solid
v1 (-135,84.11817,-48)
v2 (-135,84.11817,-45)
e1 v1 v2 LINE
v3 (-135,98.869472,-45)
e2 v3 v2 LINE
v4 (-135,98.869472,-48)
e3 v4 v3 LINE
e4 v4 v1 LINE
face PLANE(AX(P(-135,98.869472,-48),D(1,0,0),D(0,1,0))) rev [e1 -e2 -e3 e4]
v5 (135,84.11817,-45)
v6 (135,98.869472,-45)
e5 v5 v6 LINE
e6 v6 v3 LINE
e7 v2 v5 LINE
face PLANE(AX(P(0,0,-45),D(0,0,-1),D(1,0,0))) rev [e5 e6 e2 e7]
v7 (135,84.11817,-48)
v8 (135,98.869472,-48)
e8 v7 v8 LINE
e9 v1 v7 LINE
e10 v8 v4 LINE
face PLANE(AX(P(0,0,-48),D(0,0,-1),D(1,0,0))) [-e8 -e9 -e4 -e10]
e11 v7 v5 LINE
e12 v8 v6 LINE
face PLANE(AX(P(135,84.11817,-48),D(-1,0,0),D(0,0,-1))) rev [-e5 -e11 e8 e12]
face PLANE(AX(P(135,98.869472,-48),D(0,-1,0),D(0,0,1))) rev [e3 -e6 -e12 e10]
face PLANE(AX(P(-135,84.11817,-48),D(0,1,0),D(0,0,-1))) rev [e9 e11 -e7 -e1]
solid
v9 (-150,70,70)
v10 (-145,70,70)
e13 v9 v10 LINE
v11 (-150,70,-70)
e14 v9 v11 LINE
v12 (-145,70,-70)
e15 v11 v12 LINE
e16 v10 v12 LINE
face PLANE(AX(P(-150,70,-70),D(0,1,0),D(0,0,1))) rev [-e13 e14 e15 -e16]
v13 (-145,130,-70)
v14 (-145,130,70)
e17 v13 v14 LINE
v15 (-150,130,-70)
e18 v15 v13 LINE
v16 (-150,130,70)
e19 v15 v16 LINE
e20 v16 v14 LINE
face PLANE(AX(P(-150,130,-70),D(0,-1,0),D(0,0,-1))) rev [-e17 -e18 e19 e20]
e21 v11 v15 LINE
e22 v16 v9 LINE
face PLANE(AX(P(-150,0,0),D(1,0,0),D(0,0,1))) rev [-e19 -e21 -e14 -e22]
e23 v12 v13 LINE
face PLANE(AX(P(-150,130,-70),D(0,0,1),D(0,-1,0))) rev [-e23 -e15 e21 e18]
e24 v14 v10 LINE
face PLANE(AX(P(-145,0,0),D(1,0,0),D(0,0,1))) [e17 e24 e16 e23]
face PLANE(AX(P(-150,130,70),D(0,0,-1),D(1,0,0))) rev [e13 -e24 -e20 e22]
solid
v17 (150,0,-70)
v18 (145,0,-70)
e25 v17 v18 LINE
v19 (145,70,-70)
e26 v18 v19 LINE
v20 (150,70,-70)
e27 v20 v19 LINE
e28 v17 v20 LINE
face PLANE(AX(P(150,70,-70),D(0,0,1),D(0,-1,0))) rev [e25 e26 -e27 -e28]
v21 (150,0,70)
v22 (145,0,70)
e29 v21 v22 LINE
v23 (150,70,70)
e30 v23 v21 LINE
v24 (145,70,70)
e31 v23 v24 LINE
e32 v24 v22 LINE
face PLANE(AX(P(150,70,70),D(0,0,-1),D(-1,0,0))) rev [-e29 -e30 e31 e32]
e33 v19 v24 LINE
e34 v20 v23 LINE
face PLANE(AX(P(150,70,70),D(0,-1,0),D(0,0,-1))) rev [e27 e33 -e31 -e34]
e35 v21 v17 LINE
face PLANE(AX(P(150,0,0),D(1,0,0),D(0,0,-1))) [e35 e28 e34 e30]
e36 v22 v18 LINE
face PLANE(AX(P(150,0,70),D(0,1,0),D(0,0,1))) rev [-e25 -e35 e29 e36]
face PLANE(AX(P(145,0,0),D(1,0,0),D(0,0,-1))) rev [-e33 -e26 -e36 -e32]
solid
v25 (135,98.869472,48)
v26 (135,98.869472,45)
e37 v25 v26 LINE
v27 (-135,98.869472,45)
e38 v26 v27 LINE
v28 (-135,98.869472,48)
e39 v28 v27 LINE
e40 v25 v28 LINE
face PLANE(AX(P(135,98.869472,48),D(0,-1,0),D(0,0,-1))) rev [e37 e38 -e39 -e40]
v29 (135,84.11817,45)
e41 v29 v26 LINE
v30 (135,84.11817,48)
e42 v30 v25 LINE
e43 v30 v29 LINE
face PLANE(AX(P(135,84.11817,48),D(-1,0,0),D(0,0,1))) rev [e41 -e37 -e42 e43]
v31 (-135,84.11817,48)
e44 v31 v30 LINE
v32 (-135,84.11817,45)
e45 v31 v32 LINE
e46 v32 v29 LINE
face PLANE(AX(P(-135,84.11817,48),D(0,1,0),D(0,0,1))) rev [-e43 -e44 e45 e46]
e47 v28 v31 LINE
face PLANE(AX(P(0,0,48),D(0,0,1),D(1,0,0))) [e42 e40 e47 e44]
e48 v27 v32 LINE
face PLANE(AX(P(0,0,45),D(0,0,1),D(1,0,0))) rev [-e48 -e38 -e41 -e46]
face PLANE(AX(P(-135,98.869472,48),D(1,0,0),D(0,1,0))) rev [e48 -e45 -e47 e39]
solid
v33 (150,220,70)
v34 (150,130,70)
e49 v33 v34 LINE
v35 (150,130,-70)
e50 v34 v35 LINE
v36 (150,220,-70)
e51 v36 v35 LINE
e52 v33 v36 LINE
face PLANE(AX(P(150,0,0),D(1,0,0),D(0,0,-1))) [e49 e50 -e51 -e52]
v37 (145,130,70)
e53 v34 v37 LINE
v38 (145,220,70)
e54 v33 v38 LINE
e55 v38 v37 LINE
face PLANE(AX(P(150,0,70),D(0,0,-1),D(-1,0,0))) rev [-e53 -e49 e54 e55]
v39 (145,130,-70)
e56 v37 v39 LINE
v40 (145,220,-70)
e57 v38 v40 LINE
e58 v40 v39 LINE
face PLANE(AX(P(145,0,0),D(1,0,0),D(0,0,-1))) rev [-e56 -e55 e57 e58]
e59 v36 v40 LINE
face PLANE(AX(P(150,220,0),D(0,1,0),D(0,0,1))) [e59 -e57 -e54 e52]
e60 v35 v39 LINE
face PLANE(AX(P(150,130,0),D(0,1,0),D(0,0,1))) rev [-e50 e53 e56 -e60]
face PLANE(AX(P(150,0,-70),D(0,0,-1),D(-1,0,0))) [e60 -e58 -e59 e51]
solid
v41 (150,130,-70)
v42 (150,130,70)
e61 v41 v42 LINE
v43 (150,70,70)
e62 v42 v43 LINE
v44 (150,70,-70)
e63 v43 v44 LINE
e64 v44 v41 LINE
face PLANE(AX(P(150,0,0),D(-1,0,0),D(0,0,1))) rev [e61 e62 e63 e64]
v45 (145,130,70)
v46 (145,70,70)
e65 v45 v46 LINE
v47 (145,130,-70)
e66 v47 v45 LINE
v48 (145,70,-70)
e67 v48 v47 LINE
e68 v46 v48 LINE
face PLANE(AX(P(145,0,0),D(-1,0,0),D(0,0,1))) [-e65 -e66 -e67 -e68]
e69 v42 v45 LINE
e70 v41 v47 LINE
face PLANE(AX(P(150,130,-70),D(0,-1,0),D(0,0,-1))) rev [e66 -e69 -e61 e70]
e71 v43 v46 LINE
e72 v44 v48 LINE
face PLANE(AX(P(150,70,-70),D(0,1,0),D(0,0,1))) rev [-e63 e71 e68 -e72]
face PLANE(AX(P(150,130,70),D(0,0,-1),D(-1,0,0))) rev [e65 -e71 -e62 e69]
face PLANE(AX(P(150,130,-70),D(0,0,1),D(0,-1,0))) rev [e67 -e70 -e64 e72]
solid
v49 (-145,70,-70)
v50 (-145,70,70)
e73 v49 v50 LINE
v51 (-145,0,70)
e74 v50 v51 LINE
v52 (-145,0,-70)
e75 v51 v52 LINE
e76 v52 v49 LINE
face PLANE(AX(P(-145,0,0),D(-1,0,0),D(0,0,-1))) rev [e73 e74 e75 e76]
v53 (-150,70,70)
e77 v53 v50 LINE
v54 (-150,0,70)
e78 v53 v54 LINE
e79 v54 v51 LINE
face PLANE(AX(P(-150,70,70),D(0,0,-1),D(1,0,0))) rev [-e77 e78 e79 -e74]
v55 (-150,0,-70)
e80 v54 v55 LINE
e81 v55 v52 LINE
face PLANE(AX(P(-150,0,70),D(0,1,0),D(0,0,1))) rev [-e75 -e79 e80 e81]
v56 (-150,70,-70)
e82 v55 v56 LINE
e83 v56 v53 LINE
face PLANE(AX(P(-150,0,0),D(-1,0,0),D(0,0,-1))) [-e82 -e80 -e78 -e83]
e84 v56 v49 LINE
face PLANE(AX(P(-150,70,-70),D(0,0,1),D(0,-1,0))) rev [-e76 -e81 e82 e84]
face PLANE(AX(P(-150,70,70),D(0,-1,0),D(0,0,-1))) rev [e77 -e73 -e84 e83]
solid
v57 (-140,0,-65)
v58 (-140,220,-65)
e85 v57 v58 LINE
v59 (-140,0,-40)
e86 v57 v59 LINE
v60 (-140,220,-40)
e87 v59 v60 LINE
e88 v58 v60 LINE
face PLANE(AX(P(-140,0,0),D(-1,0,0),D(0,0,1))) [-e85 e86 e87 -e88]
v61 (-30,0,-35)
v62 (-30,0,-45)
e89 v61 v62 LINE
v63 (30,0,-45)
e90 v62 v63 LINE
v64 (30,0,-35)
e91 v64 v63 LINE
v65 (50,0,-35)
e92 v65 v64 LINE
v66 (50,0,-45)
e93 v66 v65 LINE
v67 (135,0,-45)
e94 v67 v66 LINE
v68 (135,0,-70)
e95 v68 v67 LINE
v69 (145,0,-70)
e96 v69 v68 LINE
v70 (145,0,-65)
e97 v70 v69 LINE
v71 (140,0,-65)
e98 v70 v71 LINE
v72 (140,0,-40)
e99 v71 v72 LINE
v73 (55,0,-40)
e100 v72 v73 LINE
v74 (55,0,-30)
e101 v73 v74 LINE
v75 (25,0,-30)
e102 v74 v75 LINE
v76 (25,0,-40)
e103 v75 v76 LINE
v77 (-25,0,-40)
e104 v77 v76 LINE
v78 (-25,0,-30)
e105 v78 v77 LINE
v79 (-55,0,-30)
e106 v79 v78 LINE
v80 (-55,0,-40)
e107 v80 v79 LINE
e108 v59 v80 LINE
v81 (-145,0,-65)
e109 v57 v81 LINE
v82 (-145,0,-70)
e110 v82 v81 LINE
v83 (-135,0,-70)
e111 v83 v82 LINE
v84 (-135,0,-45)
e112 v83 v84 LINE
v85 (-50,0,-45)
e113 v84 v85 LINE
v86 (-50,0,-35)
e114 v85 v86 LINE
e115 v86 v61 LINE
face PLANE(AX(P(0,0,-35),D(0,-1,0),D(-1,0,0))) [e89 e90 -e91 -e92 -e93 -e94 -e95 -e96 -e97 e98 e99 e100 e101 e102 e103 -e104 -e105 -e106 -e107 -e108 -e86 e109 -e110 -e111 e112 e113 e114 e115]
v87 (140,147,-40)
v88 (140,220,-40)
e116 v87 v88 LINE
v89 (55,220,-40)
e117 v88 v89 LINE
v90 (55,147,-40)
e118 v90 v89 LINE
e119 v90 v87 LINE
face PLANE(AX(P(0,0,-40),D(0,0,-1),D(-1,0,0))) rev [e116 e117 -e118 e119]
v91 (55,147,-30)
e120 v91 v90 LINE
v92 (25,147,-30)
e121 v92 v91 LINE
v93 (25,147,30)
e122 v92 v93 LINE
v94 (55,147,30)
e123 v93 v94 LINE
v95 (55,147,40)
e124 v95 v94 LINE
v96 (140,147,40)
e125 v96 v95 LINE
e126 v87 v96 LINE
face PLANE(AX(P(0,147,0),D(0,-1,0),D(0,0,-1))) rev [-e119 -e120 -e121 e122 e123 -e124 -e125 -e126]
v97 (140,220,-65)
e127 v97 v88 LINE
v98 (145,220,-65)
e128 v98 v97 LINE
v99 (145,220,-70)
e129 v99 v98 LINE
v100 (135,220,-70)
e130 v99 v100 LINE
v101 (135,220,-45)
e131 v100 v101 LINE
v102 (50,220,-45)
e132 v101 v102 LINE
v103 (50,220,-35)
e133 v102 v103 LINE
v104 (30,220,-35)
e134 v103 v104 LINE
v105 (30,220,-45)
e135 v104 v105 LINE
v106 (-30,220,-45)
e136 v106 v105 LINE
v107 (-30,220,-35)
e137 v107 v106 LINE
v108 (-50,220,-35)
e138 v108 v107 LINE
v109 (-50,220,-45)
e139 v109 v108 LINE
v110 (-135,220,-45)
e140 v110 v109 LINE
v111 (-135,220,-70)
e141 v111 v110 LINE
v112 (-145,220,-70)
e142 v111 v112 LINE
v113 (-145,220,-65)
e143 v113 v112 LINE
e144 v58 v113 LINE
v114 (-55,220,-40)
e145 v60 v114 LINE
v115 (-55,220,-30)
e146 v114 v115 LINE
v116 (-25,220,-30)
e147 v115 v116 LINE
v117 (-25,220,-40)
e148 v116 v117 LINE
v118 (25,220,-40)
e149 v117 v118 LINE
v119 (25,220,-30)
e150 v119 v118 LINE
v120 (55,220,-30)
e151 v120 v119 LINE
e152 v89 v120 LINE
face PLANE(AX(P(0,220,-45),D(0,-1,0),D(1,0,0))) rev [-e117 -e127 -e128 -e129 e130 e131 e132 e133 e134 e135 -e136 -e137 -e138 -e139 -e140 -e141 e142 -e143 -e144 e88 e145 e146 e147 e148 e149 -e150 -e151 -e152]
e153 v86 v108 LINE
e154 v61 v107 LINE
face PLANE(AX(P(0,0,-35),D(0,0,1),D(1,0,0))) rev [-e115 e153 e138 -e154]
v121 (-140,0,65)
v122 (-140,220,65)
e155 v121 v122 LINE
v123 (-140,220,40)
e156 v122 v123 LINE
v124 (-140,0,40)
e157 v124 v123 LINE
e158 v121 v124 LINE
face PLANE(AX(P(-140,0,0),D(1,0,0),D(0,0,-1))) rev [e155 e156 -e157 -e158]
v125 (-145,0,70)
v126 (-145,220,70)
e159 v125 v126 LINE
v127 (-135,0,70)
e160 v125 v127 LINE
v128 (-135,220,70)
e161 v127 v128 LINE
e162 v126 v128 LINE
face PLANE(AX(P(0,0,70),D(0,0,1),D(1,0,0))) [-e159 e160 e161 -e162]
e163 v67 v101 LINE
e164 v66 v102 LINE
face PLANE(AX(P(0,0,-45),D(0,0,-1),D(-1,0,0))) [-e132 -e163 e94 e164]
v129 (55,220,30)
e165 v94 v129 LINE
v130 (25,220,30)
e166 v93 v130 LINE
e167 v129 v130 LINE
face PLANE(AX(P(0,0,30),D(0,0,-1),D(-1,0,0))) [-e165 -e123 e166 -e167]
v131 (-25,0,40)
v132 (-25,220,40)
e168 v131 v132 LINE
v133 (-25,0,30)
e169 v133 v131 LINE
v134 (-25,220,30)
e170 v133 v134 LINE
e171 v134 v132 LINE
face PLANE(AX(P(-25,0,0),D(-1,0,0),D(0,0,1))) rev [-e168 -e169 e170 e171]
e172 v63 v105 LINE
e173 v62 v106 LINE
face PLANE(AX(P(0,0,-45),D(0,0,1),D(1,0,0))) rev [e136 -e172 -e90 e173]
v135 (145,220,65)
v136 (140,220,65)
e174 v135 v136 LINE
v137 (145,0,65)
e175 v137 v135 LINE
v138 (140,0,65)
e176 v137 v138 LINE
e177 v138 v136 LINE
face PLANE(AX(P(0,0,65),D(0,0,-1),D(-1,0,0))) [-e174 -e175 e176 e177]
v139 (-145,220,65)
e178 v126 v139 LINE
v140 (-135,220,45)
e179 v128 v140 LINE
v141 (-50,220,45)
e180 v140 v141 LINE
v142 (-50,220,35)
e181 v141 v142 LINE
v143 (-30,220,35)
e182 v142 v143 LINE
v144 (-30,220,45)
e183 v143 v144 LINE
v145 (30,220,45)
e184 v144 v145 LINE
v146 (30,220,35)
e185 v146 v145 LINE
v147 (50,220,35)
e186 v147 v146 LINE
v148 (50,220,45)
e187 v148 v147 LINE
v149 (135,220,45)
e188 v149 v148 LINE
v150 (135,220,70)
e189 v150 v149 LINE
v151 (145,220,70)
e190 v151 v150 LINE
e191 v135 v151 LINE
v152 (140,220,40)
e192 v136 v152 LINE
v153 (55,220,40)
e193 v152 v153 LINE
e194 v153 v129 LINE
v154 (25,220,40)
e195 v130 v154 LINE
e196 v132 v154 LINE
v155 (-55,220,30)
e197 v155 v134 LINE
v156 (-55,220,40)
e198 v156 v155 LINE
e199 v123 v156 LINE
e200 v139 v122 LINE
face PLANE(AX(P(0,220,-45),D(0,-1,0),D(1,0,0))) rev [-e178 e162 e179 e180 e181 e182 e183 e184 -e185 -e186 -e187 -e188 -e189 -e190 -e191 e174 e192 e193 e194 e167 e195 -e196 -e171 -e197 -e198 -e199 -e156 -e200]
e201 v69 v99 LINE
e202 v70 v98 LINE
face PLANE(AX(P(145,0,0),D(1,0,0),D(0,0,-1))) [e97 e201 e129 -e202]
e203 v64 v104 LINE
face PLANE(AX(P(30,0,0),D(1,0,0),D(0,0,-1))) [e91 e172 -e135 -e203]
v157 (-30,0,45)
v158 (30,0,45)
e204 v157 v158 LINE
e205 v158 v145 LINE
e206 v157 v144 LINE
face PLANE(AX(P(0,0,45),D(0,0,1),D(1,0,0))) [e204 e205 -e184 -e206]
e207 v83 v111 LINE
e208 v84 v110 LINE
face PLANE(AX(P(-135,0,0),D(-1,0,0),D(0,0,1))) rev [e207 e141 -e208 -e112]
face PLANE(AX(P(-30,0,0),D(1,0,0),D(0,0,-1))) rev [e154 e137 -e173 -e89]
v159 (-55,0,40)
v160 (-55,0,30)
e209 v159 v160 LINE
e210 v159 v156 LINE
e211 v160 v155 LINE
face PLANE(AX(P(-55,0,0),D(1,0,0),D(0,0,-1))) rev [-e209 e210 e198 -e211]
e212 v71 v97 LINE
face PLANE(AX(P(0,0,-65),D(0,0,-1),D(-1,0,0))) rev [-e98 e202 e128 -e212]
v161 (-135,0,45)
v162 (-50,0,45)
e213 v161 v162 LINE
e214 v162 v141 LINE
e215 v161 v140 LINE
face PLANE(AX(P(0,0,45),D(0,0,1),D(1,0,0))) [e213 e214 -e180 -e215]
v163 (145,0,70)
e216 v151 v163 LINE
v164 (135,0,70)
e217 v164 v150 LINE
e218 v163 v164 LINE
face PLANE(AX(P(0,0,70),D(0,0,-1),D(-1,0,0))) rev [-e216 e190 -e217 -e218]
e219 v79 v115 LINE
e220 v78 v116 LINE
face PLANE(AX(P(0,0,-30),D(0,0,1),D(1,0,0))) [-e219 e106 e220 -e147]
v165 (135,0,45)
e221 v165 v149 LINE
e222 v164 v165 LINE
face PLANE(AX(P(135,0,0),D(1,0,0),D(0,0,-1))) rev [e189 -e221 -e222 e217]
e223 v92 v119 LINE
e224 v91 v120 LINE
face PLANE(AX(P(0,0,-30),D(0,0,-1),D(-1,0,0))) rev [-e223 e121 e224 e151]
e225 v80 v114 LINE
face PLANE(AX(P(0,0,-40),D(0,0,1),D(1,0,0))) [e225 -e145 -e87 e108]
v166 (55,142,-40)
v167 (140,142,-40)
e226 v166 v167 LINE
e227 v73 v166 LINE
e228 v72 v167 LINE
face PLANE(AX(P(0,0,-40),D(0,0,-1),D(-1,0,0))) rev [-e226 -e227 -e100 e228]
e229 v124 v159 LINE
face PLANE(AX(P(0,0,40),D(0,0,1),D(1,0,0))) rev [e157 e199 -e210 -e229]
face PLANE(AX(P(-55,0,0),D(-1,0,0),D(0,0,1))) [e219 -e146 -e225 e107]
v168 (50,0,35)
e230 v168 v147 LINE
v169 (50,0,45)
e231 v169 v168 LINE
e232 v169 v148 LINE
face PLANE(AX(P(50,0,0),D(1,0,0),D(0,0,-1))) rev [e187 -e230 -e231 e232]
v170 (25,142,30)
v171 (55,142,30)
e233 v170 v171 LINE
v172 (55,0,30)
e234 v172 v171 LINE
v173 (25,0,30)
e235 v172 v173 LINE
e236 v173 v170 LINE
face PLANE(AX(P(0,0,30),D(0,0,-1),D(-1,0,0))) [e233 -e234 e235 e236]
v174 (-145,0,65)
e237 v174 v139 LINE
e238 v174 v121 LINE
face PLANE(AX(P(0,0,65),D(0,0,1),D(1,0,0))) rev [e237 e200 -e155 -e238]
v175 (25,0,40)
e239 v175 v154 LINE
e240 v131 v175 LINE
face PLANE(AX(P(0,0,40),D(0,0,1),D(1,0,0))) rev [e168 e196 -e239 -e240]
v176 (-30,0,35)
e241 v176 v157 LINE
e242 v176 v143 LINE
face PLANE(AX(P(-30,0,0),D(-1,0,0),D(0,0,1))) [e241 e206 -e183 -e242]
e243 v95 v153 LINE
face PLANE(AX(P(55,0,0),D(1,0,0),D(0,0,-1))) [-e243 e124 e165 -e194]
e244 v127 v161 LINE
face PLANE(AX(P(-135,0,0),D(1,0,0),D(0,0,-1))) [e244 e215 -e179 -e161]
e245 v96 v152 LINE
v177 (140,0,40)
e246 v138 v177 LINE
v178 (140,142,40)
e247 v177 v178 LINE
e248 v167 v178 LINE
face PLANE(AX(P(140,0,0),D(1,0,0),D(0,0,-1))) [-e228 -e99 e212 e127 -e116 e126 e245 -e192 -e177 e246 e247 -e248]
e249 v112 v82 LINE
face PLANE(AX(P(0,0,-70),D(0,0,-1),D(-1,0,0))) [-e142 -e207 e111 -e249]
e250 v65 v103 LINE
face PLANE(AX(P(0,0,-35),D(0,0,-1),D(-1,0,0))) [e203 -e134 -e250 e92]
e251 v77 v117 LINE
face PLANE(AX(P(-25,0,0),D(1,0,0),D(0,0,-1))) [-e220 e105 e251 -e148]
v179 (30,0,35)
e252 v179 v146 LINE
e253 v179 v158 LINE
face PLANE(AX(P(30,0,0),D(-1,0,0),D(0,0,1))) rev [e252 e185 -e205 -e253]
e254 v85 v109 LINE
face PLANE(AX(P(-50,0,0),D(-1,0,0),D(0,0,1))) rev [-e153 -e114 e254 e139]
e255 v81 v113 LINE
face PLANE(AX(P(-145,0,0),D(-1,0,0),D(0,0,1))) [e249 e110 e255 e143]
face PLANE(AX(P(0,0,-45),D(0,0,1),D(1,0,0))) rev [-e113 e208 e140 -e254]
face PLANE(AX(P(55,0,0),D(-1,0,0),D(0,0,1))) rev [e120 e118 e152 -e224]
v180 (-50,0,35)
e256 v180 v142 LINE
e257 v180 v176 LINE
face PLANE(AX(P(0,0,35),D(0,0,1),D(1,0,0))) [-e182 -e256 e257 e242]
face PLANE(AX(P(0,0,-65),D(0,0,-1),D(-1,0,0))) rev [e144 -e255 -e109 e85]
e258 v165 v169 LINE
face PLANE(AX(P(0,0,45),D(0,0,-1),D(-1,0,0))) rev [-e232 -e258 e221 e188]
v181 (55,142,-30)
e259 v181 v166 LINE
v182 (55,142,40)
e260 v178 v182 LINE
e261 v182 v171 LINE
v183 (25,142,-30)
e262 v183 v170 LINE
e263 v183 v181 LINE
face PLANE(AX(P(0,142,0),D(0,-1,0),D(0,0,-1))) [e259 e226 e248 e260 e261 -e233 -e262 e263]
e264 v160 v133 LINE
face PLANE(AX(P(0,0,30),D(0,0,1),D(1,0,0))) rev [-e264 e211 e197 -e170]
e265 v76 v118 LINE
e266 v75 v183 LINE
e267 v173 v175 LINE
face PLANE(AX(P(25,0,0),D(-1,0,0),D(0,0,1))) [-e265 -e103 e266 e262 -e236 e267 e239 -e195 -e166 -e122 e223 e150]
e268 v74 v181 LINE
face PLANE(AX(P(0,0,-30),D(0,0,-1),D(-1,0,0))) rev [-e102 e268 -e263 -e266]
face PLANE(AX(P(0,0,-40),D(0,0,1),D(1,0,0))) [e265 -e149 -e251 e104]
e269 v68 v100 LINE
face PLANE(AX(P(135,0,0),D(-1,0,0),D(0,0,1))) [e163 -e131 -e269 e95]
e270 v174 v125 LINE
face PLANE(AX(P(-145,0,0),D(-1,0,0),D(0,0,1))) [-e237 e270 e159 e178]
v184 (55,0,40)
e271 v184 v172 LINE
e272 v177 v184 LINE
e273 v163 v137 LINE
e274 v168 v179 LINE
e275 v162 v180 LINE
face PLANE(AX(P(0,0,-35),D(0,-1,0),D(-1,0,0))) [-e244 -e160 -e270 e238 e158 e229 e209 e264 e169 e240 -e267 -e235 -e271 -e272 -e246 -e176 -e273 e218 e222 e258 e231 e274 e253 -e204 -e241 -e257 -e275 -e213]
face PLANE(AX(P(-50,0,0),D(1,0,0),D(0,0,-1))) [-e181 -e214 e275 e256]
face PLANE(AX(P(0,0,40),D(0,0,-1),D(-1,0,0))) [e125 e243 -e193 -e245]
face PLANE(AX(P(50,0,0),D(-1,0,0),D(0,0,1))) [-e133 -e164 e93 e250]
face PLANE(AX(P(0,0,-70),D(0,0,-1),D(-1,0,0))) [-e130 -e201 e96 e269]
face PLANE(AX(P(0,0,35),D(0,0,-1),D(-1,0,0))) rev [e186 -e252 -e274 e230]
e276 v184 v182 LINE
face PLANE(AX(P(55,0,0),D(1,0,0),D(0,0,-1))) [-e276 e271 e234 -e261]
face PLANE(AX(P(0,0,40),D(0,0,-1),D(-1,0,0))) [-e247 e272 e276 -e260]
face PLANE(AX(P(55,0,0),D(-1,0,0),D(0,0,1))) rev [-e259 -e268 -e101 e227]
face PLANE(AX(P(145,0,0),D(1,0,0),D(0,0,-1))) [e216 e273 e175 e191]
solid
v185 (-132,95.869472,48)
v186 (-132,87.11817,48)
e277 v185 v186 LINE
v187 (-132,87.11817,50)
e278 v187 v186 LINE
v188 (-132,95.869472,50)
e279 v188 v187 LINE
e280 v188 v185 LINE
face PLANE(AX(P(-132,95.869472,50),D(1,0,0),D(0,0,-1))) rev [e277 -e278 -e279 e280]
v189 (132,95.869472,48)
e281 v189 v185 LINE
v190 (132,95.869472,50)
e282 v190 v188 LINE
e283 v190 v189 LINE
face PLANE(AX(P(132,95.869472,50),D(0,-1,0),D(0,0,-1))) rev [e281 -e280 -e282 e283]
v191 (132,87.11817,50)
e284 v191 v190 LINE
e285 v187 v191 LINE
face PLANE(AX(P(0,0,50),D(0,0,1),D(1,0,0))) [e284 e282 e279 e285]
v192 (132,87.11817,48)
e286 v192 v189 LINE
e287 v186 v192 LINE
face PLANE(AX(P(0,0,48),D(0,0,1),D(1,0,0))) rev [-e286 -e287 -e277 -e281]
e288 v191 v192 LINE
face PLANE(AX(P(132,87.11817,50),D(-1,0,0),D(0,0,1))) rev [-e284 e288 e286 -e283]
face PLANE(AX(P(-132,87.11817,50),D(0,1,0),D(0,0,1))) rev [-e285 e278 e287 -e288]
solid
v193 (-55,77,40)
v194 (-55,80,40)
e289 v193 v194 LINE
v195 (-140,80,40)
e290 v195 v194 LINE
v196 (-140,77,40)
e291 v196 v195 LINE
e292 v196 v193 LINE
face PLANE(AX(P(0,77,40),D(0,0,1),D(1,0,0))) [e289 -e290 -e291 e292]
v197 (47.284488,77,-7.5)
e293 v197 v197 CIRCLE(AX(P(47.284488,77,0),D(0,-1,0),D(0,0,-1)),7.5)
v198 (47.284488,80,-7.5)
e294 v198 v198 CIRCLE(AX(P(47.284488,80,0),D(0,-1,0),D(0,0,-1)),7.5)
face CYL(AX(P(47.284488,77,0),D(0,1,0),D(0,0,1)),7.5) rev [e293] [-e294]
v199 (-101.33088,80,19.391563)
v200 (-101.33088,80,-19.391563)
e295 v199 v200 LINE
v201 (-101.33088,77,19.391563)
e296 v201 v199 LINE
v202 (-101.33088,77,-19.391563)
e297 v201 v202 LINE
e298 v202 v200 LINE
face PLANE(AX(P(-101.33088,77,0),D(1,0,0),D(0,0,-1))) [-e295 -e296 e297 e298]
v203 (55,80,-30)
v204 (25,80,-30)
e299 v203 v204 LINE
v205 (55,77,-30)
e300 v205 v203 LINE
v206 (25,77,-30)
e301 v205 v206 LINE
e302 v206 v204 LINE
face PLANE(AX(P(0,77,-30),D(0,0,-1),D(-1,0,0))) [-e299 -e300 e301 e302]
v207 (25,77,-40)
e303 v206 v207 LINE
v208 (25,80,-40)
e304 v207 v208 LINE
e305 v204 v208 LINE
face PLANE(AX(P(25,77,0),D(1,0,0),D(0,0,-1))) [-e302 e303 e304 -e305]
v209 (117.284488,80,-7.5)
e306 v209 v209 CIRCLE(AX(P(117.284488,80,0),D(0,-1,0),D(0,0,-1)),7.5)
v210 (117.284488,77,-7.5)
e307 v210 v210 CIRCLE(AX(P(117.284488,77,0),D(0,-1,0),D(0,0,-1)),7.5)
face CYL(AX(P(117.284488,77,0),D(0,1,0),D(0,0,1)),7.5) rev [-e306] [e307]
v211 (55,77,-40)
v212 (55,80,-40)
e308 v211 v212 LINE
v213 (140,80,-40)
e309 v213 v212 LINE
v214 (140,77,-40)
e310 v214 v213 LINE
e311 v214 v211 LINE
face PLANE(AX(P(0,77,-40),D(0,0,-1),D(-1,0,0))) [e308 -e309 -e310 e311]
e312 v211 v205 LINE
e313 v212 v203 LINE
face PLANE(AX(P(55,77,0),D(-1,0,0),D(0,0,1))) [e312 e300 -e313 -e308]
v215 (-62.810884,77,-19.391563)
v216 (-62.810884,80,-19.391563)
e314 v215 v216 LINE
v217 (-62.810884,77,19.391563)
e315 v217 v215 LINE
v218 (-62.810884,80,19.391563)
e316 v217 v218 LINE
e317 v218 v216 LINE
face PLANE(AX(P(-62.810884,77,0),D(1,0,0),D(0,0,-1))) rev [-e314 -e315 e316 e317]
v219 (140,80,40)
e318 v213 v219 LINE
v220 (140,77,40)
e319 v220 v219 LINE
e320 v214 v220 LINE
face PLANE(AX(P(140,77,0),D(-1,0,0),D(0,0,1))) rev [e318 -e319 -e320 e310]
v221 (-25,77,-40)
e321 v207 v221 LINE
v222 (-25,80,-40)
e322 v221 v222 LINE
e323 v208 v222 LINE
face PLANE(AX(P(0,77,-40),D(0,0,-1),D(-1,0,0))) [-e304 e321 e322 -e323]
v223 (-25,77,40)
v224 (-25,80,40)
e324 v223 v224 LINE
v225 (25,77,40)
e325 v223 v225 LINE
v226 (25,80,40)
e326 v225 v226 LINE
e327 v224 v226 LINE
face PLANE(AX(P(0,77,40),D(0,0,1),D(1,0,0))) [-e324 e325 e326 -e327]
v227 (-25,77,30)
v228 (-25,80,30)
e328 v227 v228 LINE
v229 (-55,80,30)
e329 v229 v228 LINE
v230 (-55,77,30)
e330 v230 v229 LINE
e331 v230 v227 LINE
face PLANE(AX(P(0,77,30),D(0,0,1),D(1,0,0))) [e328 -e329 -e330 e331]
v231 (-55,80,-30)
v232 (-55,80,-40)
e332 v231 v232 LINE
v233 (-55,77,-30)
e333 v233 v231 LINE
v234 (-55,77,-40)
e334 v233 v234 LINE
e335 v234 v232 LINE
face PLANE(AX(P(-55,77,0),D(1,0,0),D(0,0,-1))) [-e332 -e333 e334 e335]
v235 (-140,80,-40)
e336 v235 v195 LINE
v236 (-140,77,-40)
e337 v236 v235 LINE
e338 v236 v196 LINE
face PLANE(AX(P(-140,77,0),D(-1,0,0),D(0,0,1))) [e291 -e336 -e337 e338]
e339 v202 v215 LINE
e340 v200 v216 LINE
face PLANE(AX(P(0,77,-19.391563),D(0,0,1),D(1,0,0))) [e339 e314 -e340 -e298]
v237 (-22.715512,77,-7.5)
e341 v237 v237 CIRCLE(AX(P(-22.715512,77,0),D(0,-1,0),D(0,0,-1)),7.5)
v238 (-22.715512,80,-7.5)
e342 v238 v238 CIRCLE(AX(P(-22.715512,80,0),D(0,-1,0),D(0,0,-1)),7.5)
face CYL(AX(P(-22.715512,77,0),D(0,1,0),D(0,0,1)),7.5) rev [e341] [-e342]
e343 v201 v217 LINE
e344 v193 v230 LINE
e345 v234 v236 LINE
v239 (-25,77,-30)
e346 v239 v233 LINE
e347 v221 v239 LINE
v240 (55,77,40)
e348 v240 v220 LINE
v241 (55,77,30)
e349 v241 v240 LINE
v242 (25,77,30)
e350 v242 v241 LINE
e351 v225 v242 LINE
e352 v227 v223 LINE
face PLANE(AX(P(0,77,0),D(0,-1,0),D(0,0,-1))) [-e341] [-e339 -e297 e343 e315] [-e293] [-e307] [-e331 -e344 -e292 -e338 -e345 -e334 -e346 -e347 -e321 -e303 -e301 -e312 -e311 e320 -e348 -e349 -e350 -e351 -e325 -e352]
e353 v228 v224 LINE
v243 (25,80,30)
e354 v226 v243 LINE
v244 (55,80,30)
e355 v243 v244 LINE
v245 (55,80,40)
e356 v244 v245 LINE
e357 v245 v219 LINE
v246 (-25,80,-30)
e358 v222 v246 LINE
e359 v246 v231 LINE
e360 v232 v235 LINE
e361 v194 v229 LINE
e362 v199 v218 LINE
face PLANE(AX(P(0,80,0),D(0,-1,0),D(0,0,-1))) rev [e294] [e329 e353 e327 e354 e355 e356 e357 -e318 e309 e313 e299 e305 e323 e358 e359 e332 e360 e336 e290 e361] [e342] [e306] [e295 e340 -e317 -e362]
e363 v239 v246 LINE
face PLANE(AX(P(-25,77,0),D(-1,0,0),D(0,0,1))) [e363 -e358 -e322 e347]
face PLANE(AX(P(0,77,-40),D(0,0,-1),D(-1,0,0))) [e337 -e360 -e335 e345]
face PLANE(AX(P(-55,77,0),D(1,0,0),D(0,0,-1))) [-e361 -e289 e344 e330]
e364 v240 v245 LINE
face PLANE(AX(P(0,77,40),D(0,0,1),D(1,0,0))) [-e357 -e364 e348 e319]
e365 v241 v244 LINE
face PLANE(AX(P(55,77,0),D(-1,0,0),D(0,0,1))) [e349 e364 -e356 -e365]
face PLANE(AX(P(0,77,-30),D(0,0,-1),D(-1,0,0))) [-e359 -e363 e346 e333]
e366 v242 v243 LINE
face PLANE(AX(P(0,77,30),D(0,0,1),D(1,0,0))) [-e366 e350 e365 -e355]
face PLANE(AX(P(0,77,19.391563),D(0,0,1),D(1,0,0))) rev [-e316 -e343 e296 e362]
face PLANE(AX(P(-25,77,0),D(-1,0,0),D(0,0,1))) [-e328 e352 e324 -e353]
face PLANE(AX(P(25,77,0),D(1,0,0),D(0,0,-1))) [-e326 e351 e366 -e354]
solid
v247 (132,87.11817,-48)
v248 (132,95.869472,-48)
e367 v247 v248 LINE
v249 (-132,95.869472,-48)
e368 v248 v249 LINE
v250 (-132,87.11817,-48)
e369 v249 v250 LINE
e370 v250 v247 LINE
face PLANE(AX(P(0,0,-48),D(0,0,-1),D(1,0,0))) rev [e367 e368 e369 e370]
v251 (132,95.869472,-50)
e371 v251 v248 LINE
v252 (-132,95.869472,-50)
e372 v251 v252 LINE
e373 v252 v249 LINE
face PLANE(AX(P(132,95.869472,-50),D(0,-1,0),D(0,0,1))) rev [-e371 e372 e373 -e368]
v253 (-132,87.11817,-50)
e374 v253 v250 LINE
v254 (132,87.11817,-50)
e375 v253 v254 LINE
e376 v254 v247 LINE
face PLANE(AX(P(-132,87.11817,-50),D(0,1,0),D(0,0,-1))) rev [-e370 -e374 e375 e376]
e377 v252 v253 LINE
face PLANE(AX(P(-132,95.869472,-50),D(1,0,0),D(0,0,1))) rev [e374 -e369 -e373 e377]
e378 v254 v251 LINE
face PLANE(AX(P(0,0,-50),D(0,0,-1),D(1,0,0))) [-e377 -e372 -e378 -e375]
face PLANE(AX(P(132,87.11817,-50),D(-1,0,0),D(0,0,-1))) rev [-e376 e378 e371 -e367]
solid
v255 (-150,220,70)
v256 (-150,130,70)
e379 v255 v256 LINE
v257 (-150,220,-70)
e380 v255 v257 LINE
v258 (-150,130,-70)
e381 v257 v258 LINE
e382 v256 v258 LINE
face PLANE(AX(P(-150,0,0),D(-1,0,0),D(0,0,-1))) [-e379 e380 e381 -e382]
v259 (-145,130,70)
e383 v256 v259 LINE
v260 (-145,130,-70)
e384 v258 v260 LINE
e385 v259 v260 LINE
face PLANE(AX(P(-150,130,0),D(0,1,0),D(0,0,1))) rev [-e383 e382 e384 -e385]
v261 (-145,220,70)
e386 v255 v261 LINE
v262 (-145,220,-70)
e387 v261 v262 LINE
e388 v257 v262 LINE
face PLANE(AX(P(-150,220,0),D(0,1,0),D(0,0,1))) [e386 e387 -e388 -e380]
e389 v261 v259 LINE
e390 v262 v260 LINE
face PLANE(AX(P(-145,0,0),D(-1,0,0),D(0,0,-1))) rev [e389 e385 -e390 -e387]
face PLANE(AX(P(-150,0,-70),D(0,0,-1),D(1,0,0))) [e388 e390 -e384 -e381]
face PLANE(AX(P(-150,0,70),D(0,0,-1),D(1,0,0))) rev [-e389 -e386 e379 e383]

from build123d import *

# Parameters (mm, degrees)
EPAISSIR1_DEPTH         = 220
ESQUISSE4_W             = 140
ESQUISSE4_H             = 60
ESQUISSE4_H_2           = 80
ENL_V_MAT_EXTRU_1_DEPTH = 5
ESQUISSE5_W             = 140
ESQUISSE5_H             = 90
BOSS_EXTRU_3_DEPTH      = 5
ESQUISSE7_W             = 140
ESQUISSE7_H             = 60
BOSS_EXTRU_4_DEPTH      = 5
ESQUISSE8_W             = 140
ESQUISSE8_H             = 70
BOSS_EXTRU_5_DEPTH      = 5
ESQUISSE9_R             = 7.5
ESQUISSE9_W             = 38.519996312
ESQUISSE9_H             = 38.783125764
BOSS_EXTRU_6_DEPTH      = 3
ESQUISSE10_W            = 140
ESQUISSE10_H            = 220
ENL_V_MAT_EXTRU_2_DEPTH = 5
BOSS_EXTRU_7_DEPTH      = 5
ESQUISSE12_W            = 270
ESQUISSE12_H            = 14.751302264
BOSS_EXTRU_8_DEPTH      = 3
ESQUISSE13_W            = 264
ESQUISSE13_H            = 8.751302264
BOSS_EXTRU_9_DEPTH      = 2


# Read off the part's stored shape, not the designer's step: Epaissir1
with BuildPart() as part:
    # Epaissir1 outline → Epaissir1 (new body)
    with BuildSketch(Plane(origin=(0, 0, 0), x_dir=(1, 0, 0), z_dir=(0, 1, 0))):
        Polygon((50, 35), (30, 35), (30, 45), (-30, 45), (-30, 35), (-50, 35), (-50, 45), (-135, 45), (-135, 70), (-150, 70), (-150, -70), (-135, -70), (-135, -45), (-50, -45), (-50, -35), (-30, -35), (-30, -45), (30, -45), (30, -35), (50, -35), (50, -45), (135, -45), (135, -70), (150, -70), (150, 70), (135, 70), (135, 45), (50, 45), align=None)
        Polygon((25, 40), (25, 30), (55, 30), (55, 40), (140, 40), (140, 65), (145, 65), (145, -65), (140, -65), (140, -40), (55, -40), (55, -30), (25, -30), (25, -40), (-25, -40), (-25, -30), (-55, -30), (-55, -40), (-140, -40), (-140, -65), (-145, -65), (-145, 65), (-140, 65), (-140, 40), (-55, 40), (-55, 30), (-25, 30), (-25, 40), align=None, mode=Mode.SUBTRACT)
    extrude(amount=EPAISSIR1_DEPTH)

    # Esquisse4 → Enlèv. mat.-Extru.1 (cut)
    with BuildSketch(Plane(origin=(150, 0, 0), x_dir=(0, 0, -1), z_dir=(1, 0, 0))):
        with Locations((0, 110)):
            Rectangle(ESQUISSE4_W, ESQUISSE4_H)
        with Locations((0, 180)):
            Rectangle(ESQUISSE4_W, ESQUISSE4_H_2)
        with Locations((0, 40)):
            Rectangle(ESQUISSE4_W, ESQUISSE4_H_2)
    extrude(amount=-ENL_V_MAT_EXTRU_1_DEPTH, mode=Mode.SUBTRACT)

    # Esquisse10 → Enlèv. mat.-Extru.2 (cut)
    with BuildSketch(Plane.ZY.offset(150)):
        with Locations((0, 110)):
            Rectangle(ESQUISSE10_W, ESQUISSE10_H)
    extrude(amount=-ENL_V_MAT_EXTRU_2_DEPTH, mode=Mode.SUBTRACT)


with BuildPart() as body_2:
    # Esquisse5 → Boss.-Extru.3 (new body)
    with BuildSketch(Plane(origin=(145, 0, 0), x_dir=(0, 0, -1), z_dir=(1, 0, 0))):
        with Locations((0, 175)):
            Rectangle(ESQUISSE5_W, ESQUISSE5_H)
    extrude(amount=BOSS_EXTRU_3_DEPTH)


with BuildPart() as body_3:
    # Esquisse7 → Boss.-Extru.4 (new body)
    with BuildSketch(Plane(origin=(145, 0, 0), x_dir=(0, 0, -1), z_dir=(1, 0, 0))):
        with Locations((0, 100)):
            Rectangle(ESQUISSE7_W, ESQUISSE7_H)
    extrude(amount=BOSS_EXTRU_4_DEPTH)


with BuildPart() as body_4:
    # Esquisse8 → Boss.-Extru.5 (new body)
    with BuildSketch(Plane(origin=(145, 0, 0), x_dir=(0, 0, -1), z_dir=(1, 0, 0))):
        with Locations((0, 35)):
            Rectangle(ESQUISSE8_W, ESQUISSE8_H)
    extrude(amount=BOSS_EXTRU_5_DEPTH)


with BuildPart() as body_5:
    # Esquisse9 → Boss.-Extru.6 (new body)
    with BuildSketch(Plane(origin=(0, 80, 0), x_dir=(-1, 0, 0), z_dir=(0, -1, 0))):
        Polygon((-140, 40), (-140, -40), (-55, -40), (-55, -30), (-25, -30), (-25, -40), (25, -40), (25, -30), (55, -30), (55, -40), (140, -40), (140, 40), (55, 40), (55, 30), (25, 30), (25, 40), (-25, 40), (-25, 30), (-55, 30), (-55, 40), align=None)
        with Locations(Location((22.715511581, 0, 0), (0, 0, 90))):
            Circle(ESQUISSE9_R, mode=Mode.SUBTRACT)
        with Locations(Location((-47.284488419, 0, 0), (0, 0, 90))):
            Circle(ESQUISSE9_R, mode=Mode.SUBTRACT)
        with Locations(Location((-117.284488419, 0, 0), (0, 0, 90))):
            Circle(ESQUISSE9_R, mode=Mode.SUBTRACT)
        with Locations((82.070881684, 0)):
            Rectangle(ESQUISSE9_W, ESQUISSE9_H, mode=Mode.SUBTRACT)
    extrude(amount=BOSS_EXTRU_6_DEPTH)


with BuildPart() as enl_v_mat_extru_2_piece_1:
    # of the separate pieces the step leaves, piece 1, a body of its own (enl_v_mat_extru_2_pieces)
    add(part.part.solids().sort_by_distance((-140, 0, 65))[0])



with BuildPart() as enl_v_mat_extru_2_piece_2:
    # of the separate pieces the step leaves, piece 2, a body of its own (enl_v_mat_extru_2_pieces)
    add(part.part.solids().sort_by_distance((50, 0, -35))[0])


with BuildPart() as body_7:
    # Symétrie1: mirrored copy
    add(body_2.part.mirror(Plane(origin=(0, 0, 0), x_dir=(0, 0, 1), z_dir=(1, 0, 0))))


with BuildPart() as body_8:
    # Sym_trie1 2: mirrored copy
    add(body_3.part.mirror(Plane(origin=(0, 0, 0), x_dir=(0, 0, 1), z_dir=(1, 0, 0))))


with BuildPart() as body_9:
    # Sym_trie1 3: mirrored copy
    add(body_4.part.mirror(Plane(origin=(0, 0, 0), x_dir=(0, 0, 1), z_dir=(1, 0, 0))))


with BuildPart() as enl_v_mat_extru_2_piece_1_1:
    add(enl_v_mat_extru_2_piece_1.part)

    add(enl_v_mat_extru_2_piece_2.part)  # Boss.-Extru.7 merges Enlèv. mat.-Extru.2 piece 2
    # Esquisse11 → Boss.-Extru.7 (add)
    with BuildSketch(Plane(origin=(0, 147, 0), x_dir=(-1, 0, 0), z_dir=(0, -1, 0))):
        Polygon((-25, -30), (-25, 30), (-55, 30), (-55, 40), (-140, 40), (-140, -40), (-55, -40), (-55, -30), align=None)
    extrude(amount=BOSS_EXTRU_7_DEPTH)


with BuildPart() as body_9_2:
    # Esquisse12 → Boss.-Extru.8 (new body)
    with BuildSketch(Plane.XY.offset(45)):
        with Locations((0, 91.493820797)):
            Rectangle(ESQUISSE12_W, ESQUISSE12_H)
    extrude(amount=BOSS_EXTRU_8_DEPTH)


with BuildPart() as body_10:
    # Esquisse13 → Boss.-Extru.9 (new body)
    with BuildSketch(Plane.XY.offset(48)):
        with Locations((0, 91.493820797)):
            Rectangle(ESQUISSE13_W, ESQUISSE13_H)
    extrude(amount=BOSS_EXTRU_9_DEPTH)


with BuildPart() as body_11:
    # Symétrie2: mirrored copy
    add(body_10.part.mirror(Plane.XY))


with BuildPart() as body_12:
    # Sym_trie2 2: mirrored copy
    add(body_9_2.part.mirror(Plane.XY))


solid = Compound([body_2.part, body_3.part, body_4.part, body_5.part, body_7.part, body_8.part, body_9.part, enl_v_mat_extru_2_piece_1_1.part, body_9_2.part, body_10.part, body_11.part, body_12.part])
